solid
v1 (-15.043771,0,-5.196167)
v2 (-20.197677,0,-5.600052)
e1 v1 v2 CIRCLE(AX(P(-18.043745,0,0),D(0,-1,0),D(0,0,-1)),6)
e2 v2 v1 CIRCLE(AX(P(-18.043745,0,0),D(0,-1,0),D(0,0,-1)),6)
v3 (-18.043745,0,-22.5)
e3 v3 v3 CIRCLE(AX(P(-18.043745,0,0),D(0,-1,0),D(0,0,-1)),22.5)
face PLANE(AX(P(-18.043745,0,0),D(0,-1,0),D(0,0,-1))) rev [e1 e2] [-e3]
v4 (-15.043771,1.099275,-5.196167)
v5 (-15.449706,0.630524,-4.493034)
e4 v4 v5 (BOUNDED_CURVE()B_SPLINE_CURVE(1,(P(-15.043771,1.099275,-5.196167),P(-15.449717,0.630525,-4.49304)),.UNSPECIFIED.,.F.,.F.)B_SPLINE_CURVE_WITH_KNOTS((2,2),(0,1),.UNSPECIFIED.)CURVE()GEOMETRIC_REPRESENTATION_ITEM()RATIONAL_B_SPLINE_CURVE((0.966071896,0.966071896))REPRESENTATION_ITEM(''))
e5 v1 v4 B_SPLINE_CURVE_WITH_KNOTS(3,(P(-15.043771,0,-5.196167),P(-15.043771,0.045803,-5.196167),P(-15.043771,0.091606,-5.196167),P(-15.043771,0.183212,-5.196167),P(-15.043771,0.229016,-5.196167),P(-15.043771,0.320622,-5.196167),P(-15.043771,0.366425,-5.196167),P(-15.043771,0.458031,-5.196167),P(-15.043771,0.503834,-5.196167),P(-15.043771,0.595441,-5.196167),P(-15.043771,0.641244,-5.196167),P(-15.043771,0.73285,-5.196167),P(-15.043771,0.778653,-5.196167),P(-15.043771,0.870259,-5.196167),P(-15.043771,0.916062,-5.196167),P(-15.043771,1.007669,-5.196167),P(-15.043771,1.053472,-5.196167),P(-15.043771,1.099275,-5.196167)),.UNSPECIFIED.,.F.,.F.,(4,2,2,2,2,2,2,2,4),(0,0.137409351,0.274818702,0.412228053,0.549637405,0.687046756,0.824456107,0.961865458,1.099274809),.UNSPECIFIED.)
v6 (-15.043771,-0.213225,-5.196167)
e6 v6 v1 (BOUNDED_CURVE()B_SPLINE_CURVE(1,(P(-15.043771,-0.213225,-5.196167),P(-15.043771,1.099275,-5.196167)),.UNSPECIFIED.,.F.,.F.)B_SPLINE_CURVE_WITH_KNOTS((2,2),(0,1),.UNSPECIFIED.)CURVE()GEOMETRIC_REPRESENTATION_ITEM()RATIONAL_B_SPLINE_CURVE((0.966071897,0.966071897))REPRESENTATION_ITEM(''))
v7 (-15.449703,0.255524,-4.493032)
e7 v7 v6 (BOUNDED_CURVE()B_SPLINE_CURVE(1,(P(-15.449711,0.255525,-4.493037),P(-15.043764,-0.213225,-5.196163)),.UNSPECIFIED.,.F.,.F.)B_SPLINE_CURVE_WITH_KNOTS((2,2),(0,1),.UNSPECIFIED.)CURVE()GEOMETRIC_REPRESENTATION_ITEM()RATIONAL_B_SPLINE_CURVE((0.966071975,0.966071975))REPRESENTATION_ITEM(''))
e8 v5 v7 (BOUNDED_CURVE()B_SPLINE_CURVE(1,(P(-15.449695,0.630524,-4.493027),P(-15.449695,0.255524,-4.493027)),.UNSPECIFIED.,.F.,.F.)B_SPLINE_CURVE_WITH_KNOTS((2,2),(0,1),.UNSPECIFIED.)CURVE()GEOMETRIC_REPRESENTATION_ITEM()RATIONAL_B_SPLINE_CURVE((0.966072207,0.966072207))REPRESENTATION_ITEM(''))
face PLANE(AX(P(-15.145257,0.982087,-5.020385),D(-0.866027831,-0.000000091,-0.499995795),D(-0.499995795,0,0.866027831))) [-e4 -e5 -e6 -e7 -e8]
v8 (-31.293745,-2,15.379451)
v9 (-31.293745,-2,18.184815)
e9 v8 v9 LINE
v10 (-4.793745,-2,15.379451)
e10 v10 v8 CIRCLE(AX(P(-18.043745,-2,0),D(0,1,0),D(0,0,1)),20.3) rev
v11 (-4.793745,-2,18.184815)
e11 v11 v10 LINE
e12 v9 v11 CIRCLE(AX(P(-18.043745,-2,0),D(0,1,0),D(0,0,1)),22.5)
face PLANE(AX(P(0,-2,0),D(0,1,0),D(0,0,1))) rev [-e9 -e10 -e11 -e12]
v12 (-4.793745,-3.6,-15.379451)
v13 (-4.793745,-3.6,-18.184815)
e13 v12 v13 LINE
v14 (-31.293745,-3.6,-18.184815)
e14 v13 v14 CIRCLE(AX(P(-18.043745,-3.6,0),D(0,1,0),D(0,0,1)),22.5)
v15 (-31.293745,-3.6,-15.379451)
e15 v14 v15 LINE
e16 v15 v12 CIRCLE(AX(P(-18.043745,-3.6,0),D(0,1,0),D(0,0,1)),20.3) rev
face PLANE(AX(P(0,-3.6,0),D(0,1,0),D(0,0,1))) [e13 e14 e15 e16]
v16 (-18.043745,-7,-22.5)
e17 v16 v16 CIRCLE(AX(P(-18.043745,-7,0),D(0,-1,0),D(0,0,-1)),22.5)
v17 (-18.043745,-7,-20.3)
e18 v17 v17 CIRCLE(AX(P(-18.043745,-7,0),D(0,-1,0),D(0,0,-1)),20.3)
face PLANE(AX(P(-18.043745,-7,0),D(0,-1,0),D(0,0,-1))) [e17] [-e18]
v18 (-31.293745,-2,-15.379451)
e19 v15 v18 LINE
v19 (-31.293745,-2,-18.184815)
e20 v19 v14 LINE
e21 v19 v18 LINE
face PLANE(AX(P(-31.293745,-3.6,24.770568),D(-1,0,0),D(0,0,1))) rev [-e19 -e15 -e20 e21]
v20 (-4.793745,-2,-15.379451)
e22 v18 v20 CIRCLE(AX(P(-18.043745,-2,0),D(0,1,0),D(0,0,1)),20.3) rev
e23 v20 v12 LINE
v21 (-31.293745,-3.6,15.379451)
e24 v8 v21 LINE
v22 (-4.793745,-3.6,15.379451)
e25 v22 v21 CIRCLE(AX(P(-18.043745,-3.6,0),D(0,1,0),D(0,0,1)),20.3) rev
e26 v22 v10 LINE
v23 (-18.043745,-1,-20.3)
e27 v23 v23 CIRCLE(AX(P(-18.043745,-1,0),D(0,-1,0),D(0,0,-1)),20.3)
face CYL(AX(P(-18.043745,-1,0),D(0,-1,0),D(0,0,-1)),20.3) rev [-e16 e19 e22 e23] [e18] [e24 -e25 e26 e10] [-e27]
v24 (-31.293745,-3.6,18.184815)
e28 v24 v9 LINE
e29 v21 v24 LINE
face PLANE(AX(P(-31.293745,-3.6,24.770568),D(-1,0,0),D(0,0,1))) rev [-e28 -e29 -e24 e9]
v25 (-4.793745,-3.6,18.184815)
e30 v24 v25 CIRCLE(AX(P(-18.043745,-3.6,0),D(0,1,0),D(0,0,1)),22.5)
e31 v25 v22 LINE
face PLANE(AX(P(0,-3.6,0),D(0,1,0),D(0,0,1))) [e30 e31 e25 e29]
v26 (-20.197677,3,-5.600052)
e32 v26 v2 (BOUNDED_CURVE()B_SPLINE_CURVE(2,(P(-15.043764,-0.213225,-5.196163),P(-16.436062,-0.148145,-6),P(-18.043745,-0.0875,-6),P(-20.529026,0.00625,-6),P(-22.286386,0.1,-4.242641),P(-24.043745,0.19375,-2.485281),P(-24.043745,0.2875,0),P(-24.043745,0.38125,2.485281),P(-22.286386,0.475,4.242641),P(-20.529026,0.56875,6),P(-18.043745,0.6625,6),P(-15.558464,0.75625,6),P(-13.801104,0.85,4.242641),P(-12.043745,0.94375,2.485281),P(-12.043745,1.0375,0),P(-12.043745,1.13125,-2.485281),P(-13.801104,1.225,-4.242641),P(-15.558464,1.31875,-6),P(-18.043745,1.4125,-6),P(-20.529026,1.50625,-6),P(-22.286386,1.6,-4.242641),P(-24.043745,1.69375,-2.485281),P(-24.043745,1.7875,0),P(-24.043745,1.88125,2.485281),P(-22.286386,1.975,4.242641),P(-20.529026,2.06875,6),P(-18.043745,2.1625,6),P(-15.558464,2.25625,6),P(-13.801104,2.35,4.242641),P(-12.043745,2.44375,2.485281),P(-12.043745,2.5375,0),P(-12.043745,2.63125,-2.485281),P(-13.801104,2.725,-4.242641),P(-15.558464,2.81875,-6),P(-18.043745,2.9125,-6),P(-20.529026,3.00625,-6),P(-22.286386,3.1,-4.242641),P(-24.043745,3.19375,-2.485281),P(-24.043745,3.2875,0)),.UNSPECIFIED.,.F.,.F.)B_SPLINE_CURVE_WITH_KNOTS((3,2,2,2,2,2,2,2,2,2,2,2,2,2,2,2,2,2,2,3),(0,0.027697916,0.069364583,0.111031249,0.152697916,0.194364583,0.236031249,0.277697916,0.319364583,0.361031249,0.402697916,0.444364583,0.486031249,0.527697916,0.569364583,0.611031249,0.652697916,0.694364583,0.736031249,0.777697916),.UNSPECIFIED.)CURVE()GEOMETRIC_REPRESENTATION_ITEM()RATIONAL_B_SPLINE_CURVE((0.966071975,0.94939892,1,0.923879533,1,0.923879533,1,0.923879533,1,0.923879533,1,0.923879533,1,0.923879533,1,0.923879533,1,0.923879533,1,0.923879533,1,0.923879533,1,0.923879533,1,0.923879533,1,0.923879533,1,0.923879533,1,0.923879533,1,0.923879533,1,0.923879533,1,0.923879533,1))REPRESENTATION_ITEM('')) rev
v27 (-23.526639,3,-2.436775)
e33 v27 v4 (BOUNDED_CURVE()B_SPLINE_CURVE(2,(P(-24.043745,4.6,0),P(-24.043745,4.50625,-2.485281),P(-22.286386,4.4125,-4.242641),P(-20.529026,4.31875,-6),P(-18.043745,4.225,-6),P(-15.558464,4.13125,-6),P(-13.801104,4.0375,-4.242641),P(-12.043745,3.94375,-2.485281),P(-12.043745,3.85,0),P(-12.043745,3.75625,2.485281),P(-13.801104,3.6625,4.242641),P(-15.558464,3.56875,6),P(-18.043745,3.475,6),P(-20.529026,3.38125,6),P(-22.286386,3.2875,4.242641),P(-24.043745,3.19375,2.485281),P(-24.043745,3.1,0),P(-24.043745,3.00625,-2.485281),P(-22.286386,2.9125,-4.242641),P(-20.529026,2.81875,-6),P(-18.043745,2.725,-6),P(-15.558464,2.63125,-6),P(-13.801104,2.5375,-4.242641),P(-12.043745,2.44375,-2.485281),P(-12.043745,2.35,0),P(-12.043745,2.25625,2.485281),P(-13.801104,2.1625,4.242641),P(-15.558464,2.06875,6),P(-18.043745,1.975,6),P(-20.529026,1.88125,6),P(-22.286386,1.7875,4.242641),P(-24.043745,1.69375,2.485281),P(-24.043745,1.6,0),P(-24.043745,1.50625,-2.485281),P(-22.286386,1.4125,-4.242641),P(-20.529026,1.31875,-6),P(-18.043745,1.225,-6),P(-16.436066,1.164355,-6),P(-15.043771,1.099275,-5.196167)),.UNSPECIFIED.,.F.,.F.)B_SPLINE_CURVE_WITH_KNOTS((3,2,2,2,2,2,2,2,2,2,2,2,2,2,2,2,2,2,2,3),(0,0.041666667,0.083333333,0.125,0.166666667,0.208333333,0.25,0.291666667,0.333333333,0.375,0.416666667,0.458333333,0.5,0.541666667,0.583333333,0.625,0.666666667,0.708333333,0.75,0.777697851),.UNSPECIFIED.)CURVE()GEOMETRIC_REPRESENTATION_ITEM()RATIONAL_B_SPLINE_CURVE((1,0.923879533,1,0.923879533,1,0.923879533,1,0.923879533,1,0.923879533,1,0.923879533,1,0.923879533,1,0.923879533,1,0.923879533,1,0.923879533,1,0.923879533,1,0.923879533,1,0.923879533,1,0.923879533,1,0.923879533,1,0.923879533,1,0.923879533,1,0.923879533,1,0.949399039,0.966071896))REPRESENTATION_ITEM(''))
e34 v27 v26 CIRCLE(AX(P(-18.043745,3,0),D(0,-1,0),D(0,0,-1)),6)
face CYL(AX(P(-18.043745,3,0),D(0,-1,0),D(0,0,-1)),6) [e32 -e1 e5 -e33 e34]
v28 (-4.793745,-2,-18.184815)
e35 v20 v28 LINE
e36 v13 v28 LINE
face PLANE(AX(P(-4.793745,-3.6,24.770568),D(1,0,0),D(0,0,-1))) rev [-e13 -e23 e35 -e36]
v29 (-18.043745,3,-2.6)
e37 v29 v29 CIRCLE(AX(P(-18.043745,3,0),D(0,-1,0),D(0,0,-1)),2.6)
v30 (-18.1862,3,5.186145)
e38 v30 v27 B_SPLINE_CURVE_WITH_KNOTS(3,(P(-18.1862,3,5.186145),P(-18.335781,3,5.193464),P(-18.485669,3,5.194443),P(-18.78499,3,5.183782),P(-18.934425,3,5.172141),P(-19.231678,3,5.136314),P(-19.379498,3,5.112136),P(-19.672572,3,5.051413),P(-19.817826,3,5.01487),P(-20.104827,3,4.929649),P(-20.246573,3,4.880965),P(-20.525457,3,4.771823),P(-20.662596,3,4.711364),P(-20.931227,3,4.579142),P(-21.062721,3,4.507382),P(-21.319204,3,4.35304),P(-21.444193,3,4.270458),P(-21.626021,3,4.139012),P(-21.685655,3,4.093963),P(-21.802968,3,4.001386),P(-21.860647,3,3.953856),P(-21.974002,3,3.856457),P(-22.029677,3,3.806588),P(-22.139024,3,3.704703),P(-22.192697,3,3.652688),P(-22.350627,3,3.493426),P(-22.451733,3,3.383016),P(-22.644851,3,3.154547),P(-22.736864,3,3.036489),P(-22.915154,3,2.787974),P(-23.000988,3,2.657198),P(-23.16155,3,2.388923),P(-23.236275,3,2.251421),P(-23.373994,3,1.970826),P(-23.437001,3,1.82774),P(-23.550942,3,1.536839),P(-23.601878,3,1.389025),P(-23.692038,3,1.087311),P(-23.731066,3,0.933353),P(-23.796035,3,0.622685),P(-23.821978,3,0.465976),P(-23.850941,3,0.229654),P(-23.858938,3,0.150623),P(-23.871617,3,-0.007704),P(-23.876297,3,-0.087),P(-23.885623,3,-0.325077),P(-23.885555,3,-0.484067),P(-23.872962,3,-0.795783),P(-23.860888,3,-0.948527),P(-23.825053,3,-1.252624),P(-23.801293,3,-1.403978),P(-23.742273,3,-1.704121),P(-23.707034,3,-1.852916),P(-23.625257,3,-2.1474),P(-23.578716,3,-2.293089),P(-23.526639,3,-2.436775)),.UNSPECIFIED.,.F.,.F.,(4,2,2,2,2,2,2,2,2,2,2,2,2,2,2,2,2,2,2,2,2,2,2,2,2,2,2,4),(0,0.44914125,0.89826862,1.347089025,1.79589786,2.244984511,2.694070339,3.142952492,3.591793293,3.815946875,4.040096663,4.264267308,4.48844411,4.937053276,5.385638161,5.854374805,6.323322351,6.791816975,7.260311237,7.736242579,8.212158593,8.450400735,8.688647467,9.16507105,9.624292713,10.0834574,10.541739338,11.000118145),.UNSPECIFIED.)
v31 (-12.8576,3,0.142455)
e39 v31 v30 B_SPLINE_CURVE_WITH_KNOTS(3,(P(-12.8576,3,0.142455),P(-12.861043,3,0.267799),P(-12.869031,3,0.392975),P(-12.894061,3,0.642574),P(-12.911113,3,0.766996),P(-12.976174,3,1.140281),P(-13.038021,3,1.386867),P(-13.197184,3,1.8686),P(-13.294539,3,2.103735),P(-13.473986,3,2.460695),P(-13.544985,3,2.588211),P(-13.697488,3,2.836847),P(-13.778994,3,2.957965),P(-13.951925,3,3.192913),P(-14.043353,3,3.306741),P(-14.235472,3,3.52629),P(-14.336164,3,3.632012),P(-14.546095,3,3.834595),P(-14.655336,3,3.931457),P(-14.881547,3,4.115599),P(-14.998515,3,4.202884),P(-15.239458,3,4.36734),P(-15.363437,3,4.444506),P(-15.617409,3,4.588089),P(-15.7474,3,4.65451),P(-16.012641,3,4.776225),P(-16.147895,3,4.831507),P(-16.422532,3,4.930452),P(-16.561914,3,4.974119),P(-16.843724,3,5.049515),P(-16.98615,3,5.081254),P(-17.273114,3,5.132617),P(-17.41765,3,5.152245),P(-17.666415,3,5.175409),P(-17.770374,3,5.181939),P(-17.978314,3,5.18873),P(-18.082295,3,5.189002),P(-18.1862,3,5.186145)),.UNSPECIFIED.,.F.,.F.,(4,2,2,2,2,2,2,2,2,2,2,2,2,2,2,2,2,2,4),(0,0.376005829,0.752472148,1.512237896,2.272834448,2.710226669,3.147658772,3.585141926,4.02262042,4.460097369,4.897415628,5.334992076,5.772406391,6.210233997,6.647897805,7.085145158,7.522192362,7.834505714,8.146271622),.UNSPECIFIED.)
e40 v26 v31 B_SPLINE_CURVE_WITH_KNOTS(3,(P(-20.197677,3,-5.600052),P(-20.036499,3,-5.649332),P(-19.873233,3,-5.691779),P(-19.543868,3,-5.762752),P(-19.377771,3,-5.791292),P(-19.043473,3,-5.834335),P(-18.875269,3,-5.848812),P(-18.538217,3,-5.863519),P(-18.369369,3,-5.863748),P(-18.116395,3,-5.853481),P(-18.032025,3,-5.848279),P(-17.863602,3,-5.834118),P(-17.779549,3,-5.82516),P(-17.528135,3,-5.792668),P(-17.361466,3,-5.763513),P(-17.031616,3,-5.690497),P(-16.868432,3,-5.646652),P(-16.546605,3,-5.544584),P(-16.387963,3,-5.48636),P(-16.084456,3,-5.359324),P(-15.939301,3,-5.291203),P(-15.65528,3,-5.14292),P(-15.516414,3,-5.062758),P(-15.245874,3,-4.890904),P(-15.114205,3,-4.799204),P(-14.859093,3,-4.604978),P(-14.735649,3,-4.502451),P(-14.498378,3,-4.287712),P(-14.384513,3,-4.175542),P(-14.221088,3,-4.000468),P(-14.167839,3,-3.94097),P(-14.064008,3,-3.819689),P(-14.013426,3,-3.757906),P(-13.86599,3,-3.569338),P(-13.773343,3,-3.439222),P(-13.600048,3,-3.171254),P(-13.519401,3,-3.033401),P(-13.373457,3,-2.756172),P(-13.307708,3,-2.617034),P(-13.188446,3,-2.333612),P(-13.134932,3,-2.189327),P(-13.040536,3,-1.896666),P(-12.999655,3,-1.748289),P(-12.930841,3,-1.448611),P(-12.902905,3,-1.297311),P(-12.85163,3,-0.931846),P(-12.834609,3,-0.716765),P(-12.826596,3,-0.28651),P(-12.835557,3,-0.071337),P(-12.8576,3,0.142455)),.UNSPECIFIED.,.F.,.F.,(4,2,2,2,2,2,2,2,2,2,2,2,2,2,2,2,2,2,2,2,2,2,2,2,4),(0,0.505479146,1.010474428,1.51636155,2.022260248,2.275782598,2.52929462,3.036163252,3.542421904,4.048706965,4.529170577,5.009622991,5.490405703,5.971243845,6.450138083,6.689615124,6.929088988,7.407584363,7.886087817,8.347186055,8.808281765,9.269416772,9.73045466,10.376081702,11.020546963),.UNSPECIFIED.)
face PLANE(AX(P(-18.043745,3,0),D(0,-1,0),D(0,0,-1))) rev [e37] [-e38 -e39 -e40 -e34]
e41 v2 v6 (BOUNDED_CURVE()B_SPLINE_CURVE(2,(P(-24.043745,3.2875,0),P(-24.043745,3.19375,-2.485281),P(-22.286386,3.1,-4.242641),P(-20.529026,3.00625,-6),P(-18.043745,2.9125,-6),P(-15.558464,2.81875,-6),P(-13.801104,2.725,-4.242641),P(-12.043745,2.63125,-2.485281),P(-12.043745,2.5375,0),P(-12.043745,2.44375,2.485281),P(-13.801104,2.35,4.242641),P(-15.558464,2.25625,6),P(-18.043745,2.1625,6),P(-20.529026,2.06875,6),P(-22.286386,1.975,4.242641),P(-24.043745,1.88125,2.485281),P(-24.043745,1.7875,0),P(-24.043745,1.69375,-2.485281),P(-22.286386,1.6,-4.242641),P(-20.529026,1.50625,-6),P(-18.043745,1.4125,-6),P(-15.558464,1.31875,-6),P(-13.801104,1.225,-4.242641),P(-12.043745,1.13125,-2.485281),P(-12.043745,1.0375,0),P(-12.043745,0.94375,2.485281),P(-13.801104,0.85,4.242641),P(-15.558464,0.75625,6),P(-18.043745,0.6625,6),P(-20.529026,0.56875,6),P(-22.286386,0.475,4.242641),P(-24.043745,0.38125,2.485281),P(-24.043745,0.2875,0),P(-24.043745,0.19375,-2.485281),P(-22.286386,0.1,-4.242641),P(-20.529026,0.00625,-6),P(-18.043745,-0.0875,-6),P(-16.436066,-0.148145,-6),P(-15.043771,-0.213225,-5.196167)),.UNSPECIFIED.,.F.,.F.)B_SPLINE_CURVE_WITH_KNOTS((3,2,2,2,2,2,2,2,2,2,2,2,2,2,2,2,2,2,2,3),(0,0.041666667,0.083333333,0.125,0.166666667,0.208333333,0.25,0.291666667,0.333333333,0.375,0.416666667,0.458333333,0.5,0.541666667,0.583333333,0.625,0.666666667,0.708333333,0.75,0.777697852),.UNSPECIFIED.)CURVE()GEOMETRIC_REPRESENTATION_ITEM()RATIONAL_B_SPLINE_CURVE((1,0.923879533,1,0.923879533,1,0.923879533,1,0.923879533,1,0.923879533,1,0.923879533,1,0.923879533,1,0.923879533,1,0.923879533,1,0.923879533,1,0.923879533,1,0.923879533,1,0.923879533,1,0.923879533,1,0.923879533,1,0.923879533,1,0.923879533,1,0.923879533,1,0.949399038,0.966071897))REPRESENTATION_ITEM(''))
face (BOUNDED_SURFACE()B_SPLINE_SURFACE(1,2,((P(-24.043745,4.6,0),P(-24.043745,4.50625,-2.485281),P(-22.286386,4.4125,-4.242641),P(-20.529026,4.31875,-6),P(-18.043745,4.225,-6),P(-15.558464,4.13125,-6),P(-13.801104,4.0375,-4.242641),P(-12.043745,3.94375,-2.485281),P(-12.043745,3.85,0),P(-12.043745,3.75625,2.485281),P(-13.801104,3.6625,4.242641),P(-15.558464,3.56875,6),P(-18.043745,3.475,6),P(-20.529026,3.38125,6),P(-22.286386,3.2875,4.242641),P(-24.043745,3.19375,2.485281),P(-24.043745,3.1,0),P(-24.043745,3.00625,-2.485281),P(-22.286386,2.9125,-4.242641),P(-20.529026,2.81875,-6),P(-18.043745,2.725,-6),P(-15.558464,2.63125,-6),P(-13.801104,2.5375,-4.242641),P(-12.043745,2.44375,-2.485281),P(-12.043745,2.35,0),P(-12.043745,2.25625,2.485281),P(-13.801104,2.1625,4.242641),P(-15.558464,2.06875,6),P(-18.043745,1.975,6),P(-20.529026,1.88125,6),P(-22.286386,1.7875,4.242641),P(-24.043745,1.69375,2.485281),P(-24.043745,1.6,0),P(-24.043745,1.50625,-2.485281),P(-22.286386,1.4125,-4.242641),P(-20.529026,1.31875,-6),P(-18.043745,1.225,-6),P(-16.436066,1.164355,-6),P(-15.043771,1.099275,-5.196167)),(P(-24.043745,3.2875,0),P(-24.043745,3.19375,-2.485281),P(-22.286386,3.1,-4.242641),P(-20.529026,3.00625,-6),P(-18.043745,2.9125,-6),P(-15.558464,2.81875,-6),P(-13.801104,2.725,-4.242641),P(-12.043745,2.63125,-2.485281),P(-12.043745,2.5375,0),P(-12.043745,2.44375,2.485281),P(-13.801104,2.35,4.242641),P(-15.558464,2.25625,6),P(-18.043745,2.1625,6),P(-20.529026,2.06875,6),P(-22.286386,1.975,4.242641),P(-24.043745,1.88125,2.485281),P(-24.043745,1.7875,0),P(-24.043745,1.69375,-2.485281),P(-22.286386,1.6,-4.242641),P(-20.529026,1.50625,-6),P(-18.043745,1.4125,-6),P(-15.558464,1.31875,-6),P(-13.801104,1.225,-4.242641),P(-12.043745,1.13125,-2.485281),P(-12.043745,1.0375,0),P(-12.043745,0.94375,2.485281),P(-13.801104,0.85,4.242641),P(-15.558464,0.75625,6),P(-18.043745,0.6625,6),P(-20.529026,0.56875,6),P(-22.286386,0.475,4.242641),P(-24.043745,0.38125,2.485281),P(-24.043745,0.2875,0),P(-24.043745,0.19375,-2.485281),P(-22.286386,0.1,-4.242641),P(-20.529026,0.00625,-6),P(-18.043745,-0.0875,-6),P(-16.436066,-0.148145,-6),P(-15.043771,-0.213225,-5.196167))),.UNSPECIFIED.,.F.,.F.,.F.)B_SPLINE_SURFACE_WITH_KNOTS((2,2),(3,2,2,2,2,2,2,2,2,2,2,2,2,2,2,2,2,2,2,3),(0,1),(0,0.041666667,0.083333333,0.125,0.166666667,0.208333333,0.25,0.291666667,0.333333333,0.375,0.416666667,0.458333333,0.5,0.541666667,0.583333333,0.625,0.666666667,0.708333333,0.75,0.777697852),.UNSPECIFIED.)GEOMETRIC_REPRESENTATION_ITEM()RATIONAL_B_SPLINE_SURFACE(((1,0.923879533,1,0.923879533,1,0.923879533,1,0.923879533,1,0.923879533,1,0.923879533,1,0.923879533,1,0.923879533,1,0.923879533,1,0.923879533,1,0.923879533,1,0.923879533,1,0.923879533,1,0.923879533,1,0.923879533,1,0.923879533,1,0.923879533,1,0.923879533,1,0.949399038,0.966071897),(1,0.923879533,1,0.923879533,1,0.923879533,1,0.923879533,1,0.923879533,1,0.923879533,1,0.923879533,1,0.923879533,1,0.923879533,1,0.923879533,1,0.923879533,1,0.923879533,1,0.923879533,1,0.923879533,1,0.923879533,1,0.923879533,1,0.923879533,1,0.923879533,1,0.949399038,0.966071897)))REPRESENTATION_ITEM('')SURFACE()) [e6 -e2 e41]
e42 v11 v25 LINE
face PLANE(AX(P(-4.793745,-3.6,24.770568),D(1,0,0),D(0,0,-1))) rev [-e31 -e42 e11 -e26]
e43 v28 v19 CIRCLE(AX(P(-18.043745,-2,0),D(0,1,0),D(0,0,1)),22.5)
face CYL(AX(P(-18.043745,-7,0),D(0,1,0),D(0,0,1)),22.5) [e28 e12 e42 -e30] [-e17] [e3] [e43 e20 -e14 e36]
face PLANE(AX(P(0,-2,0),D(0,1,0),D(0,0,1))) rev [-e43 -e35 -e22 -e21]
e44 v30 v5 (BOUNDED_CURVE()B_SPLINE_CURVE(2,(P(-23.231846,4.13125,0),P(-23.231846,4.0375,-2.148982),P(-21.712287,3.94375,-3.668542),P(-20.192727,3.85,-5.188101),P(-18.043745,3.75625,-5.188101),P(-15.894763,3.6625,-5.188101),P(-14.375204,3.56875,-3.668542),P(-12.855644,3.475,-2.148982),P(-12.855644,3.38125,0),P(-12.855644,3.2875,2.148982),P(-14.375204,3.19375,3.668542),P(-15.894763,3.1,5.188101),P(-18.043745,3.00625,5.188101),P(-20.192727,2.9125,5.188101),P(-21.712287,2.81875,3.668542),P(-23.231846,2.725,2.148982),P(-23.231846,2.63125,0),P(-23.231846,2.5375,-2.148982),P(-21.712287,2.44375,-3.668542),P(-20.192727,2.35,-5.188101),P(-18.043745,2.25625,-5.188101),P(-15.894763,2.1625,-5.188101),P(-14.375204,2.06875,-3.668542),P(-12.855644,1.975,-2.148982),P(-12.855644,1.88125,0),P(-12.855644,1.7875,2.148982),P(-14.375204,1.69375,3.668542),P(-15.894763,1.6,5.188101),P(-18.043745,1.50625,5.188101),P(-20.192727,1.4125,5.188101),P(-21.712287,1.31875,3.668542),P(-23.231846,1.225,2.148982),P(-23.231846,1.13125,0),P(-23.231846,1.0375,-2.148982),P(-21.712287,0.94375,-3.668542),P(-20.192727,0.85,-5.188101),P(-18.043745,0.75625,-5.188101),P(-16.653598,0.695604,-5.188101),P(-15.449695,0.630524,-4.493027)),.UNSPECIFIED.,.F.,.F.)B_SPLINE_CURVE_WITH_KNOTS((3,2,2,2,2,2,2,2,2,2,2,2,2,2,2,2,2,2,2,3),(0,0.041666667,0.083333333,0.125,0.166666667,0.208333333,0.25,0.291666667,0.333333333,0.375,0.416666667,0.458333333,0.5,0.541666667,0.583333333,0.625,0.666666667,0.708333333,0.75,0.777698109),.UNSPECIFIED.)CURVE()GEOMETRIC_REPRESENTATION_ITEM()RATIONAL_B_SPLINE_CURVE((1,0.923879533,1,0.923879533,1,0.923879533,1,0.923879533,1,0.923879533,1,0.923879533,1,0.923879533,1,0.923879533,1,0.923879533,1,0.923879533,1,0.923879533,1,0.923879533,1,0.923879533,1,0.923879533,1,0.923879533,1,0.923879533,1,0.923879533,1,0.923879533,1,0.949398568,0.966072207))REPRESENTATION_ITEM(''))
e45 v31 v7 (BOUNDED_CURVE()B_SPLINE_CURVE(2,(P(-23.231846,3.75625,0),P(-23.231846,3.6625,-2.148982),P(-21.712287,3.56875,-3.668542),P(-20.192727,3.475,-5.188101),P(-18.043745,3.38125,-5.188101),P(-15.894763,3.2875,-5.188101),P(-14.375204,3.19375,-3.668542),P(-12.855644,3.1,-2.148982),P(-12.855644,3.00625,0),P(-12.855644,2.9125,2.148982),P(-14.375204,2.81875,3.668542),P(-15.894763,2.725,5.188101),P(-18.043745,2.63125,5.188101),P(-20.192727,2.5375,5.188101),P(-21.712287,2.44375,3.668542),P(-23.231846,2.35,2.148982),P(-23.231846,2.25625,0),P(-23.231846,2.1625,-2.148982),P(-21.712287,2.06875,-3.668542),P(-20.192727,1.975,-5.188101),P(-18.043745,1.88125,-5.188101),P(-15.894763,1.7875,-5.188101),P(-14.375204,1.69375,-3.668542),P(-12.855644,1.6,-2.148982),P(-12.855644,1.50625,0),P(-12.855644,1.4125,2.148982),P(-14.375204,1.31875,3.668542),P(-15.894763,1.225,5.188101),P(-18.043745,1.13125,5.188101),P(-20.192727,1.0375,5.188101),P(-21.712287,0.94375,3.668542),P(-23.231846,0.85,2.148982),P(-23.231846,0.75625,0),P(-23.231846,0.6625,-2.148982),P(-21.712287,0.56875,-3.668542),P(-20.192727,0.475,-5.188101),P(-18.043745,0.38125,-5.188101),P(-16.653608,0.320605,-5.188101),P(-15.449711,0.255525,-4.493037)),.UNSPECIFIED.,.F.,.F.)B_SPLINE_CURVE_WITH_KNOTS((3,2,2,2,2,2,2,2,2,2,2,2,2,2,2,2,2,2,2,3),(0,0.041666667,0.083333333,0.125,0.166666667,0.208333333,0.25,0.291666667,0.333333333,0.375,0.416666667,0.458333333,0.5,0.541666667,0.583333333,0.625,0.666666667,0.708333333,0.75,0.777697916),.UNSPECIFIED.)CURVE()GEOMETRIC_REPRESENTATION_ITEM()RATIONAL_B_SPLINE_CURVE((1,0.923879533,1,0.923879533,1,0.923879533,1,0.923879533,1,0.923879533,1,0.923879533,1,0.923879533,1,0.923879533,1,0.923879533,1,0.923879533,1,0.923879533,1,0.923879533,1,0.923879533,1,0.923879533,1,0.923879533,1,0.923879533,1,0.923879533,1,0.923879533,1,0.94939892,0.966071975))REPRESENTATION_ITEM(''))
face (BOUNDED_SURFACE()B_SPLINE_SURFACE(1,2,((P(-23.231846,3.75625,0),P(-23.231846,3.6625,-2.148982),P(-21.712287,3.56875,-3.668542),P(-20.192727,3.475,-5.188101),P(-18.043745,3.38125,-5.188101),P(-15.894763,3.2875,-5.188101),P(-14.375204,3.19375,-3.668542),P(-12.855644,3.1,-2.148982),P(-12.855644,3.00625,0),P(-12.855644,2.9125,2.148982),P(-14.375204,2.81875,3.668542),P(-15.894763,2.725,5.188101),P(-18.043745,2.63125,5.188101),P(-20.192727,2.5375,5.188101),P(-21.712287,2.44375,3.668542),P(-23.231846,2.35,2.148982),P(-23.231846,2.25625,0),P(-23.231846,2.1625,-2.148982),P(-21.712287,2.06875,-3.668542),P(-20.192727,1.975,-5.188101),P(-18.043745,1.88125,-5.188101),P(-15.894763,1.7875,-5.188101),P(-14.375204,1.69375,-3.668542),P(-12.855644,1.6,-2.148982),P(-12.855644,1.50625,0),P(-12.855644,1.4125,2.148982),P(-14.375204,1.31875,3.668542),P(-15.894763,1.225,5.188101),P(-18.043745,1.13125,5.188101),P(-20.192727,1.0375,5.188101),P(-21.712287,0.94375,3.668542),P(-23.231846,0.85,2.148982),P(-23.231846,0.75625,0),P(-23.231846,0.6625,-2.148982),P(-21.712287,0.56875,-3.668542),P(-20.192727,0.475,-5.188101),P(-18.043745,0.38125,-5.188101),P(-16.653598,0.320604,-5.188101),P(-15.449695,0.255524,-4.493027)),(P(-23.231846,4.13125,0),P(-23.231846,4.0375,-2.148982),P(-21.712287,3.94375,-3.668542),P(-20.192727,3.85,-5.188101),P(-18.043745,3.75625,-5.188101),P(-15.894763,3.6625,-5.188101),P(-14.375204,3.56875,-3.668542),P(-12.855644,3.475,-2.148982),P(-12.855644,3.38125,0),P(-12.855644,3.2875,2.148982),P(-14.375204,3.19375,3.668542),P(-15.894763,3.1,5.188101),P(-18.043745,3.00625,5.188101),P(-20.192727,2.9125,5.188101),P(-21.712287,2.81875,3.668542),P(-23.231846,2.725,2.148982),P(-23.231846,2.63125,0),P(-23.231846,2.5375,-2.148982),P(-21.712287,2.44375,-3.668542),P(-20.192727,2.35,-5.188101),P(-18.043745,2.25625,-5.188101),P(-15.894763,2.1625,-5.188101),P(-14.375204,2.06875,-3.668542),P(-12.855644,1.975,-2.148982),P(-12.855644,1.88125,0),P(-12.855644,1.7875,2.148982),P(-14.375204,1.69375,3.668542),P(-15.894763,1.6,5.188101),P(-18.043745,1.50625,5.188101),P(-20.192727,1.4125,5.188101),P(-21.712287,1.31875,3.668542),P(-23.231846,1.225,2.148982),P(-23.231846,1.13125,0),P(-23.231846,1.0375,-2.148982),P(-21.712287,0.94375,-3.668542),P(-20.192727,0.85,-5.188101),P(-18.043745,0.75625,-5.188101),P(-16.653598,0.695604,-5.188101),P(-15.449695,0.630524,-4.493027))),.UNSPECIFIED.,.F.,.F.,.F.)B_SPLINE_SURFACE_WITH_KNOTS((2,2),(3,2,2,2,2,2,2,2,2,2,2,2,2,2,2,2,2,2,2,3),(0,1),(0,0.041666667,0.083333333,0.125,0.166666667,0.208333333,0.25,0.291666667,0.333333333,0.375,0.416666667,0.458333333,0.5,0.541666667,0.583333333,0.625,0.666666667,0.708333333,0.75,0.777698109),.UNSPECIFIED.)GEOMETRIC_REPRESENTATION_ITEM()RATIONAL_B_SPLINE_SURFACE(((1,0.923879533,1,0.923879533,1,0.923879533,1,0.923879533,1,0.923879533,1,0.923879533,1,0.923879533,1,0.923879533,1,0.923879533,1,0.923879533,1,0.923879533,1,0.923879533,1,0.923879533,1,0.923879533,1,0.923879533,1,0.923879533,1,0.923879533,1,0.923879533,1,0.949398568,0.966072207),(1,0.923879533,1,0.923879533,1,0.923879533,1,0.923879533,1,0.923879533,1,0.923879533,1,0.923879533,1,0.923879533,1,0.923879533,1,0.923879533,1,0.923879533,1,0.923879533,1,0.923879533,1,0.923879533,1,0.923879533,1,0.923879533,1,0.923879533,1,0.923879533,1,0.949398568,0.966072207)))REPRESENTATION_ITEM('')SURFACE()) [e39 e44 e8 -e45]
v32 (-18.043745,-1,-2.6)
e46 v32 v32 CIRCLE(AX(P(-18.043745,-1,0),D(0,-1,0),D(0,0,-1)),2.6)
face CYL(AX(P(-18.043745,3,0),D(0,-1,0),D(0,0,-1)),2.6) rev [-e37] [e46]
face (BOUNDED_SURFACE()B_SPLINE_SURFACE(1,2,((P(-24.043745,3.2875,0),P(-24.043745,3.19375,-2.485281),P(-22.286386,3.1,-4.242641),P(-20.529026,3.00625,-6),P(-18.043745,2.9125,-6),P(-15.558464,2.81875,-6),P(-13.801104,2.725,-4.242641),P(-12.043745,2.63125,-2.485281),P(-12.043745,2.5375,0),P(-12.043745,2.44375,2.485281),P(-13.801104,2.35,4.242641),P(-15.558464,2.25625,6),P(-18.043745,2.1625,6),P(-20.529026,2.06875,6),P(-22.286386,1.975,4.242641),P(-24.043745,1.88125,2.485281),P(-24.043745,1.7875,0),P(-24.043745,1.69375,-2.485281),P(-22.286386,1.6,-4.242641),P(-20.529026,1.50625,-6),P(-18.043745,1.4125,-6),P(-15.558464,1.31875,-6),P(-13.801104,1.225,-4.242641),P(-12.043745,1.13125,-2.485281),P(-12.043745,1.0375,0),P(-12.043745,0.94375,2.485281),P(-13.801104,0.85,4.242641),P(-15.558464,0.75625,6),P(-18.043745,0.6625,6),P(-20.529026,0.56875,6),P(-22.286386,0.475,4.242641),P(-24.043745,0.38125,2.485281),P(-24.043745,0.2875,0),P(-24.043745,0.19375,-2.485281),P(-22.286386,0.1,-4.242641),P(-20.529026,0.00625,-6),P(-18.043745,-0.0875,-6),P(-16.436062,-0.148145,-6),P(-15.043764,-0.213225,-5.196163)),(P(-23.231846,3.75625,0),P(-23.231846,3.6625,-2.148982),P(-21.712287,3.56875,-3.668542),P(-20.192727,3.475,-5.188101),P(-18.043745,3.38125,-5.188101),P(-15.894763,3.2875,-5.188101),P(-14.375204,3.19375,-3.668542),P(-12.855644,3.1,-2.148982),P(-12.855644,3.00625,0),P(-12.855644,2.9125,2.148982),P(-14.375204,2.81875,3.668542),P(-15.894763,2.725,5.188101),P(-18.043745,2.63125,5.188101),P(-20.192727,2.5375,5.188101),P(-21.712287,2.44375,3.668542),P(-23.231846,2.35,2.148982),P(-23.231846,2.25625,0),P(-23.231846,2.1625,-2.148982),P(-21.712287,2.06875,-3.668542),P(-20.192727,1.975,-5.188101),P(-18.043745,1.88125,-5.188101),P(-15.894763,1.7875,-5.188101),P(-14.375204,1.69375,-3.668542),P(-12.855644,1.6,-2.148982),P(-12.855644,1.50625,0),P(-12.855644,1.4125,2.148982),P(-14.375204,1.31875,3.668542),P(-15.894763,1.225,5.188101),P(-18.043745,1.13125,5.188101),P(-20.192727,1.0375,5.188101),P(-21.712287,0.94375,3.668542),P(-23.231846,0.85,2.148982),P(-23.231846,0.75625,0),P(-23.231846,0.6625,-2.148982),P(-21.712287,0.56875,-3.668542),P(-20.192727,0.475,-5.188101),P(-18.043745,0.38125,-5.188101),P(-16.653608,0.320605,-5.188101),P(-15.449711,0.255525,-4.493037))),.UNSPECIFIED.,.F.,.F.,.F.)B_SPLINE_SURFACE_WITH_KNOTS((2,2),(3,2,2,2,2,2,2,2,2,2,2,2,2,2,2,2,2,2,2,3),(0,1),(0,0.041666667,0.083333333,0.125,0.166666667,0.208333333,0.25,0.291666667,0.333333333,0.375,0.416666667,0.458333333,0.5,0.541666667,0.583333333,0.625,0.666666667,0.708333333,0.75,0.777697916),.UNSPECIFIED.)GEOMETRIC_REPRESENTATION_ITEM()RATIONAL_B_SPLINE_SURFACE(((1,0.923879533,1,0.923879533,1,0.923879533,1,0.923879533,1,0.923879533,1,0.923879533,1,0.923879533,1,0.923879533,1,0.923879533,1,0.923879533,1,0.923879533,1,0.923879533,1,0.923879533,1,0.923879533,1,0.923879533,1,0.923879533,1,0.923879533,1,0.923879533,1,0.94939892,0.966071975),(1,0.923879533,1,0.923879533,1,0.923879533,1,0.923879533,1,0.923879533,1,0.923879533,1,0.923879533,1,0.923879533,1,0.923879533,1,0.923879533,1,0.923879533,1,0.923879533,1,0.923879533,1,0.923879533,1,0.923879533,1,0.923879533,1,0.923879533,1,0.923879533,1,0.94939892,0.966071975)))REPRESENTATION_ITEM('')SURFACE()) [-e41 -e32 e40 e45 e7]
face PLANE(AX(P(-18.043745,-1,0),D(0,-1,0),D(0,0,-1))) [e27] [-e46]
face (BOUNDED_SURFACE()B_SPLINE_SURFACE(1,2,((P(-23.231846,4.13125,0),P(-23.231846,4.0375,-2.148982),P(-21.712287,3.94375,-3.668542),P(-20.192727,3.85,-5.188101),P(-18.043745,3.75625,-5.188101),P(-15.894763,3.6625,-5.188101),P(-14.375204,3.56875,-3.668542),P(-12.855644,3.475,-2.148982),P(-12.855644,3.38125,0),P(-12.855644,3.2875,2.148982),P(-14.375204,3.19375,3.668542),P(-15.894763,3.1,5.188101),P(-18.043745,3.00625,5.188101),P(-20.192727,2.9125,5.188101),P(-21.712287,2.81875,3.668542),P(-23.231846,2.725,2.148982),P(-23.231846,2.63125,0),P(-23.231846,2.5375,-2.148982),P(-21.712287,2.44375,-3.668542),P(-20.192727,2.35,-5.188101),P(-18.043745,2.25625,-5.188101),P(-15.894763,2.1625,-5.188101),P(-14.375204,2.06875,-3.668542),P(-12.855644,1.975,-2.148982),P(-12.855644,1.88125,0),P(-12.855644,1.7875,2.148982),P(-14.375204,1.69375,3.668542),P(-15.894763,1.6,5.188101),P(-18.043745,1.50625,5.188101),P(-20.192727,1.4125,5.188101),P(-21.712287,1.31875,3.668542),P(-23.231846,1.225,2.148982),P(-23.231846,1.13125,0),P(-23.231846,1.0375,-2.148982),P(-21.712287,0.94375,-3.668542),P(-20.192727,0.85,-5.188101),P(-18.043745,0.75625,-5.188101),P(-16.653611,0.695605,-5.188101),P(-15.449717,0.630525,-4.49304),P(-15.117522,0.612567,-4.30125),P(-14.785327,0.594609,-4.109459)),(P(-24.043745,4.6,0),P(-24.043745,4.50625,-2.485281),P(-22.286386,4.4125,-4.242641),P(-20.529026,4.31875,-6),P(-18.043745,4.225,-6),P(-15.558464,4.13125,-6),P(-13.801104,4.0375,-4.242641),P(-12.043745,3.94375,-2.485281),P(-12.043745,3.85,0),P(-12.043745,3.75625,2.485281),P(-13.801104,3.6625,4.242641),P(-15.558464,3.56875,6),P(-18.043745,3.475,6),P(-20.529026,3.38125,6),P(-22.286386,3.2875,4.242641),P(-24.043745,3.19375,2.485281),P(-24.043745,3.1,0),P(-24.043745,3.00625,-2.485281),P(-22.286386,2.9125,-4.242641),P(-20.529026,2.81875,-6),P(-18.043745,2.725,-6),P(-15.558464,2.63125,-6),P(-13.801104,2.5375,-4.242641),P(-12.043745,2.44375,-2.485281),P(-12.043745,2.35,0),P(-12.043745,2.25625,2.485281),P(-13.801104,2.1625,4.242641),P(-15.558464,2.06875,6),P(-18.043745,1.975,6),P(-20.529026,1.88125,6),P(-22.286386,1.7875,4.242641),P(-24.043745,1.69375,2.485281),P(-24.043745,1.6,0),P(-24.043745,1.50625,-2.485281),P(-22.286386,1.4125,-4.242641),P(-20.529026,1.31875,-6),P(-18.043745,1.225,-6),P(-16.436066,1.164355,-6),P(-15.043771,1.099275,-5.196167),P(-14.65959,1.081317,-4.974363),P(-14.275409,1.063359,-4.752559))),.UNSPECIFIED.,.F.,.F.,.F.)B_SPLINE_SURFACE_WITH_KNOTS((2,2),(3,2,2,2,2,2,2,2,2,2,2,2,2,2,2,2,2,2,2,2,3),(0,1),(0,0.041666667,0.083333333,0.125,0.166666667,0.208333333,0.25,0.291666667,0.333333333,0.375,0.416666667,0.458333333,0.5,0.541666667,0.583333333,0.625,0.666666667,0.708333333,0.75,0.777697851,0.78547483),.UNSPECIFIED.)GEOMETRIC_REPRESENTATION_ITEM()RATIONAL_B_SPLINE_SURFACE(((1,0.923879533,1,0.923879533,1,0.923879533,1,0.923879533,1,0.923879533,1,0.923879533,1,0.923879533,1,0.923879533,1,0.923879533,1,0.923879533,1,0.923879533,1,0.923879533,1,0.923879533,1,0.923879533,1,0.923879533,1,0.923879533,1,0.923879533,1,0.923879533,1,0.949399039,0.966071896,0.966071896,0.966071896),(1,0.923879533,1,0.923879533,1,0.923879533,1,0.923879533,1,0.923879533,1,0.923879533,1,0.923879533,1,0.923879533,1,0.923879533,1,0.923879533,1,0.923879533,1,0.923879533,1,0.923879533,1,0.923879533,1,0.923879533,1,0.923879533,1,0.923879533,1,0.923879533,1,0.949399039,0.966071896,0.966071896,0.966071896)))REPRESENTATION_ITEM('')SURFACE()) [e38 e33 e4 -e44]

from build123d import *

# Parameters (mm, degrees)
SKIZZE1_R                            = 5
ZYLINDER_DEPTH                       = 2.2
SCHNITT_LINEAR_AUSTRAGEN1_DEPTH      = 10
SCHNITT_LINEAR_AUSTRAGEN1_DEPTH_BACK = 5
SKIZZE4_R                            = 4.5
SKIZZE6_R                            = 22.5
FASSUNG_OBJEKTTR_GERGEWINDE_DEPTH    = 7
SKIZZE11_R                           = 20.3
BOHRUNG_F_R_INNENGEWINDE_DEPTH       = 6
SKIZZE13_R                           = 6
AUFSATZ_LINEAR_AUSTRAGEN1_DEPTH      = 3
SKIZZE16_R                           = 2.6
SCHNITT_LINEAR_AUSTRAGEN13_DEPTH     = 10
GEWINDE1_PITCH                       = 1.5
SKIZZE17_W                           = 26.5
SKIZZE17_H                           = 49.541135346
SCHNITT_LINEAR_AUSTRAGEN14_DEPTH     = 1.6


with BuildPart() as part:
    # Skizze1 → Zylinder (new body)
    with BuildSketch(Plane(origin=(0, 0, 0), x_dir=(1, 0, 0), z_dir=(0, 1, 0))):
        with Locations(Location((-18.043745097, 0, 0), (0, 0, 270))):
            Circle(SKIZZE1_R)
    extrude(amount=ZYLINDER_DEPTH)

    # Skizze4 → Schnitt-Linear austragen1 (cut, two sides: drawn at the far end of the back side and taken through both)
    with BuildSketch(Plane(origin=(0, 2.2, 0), x_dir=(1, 0, 0), z_dir=(0, 1, 0)).offset(-SCHNITT_LINEAR_AUSTRAGEN1_DEPTH_BACK)):
        with Locations(Location((-18.043745097, 0, 0), (0, 0, 270))):
            Circle(SKIZZE4_R)
    extrude(amount=SCHNITT_LINEAR_AUSTRAGEN1_DEPTH + SCHNITT_LINEAR_AUSTRAGEN1_DEPTH_BACK, mode=Mode.SUBTRACT)

    # Skizze6 → Fassung Objektträgergewinde (add)
    with BuildSketch(Plane(origin=(0, 0, 0), x_dir=(-1, 0, 0), z_dir=(0, -1, 0))):
        with Locations(Location((18.043745097, 0, 0), (0, 0, 90))):
            Circle(SKIZZE6_R)
    extrude(amount=FASSUNG_OBJEKTTR_GERGEWINDE_DEPTH)

    # Skizze11 → Bohrung für Innengewinde (cut)
    with BuildSketch(Plane(origin=(0, -7, 0), x_dir=(-1, 0, 0), z_dir=(0, -1, 0))):
        with Locations(Location((18.043745097, 0, 0), (0, 0, 90))):
            Circle(SKIZZE11_R)
    extrude(amount=-BOHRUNG_F_R_INNENGEWINDE_DEPTH, mode=Mode.SUBTRACT)

    # Skizze13 → Aufsatz-Linear austragen1 (add)
    with BuildSketch(Plane(origin=(0, 0, 0), x_dir=(-1, 0, 0), z_dir=(0, -1, 0))):
        with Locations(Location((18.043745097, 0, 0), (0, 0, 90))):
            Circle(SKIZZE13_R)
    extrude(amount=-AUFSATZ_LINEAR_AUSTRAGEN1_DEPTH)

    # Skizze16 → Schnitt-Linear austragen13 (cut)
    with BuildSketch(Plane(origin=(0, -7, 0), x_dir=(-1, 0, 0), z_dir=(0, -1, 0))):
        with Locations(Location((18.043745097, 0, 0), (0, 0, 90))):
            Circle(SKIZZE16_R)
    extrude(amount=-SCHNITT_LINEAR_AUSTRAGEN13_DEPTH, mode=Mode.SUBTRACT)

    # Gewinde1: the profile of Gewindeprofil1 profile screwed along a right-hand helix of 2.333333 turns, 8 arcs to a turn; built about Z, then put on its axis
    gewinde1_z = Axis((0, 0, 0), (0, 0, 1))
    gewinde1_corners = [(6.0003, 0, -0.000173205), (6.0003, 0, 1.312673201), (5.188101187, 0, 0.843749998), (5.188101187, 0, 0.468749998)]
    with BuildLine(mode=Mode.PRIVATE) as gewinde1_profile:
        Line(gewinde1_corners[0], gewinde1_corners[1])
        Line(gewinde1_corners[1], gewinde1_corners[2])
        Line(gewinde1_corners[2], gewinde1_corners[3])
        Line(gewinde1_corners[3], gewinde1_corners[0])
    gewinde1_cap = Face(gewinde1_profile.wire())
    gewinde1_turn_angles = [0, 22.5, 45, 67.5, 90, 112.5, 135, 157.5, 180, 202.5, 225, 247.5, 270, 292.5, 315, 337.5, 360]
    gewinde1_turn_weights = [1, 0.9238795325112867, 1, 0.9238795325112867, 1, 0.9238795325112867, 1, 0.9238795325112867, 1, 0.9238795325112867, 1, 0.9238795325112867, 1, 0.9238795325112867, 1, 0.9238795325112867, 1]
    gewinde1_turn_rails = [Edge.make_bspline([Vector(p[0], p[1], 0).rotate(gewinde1_z, gewinde1_turn_angles[k]) / gewinde1_turn_weights[k] + Vector(0, 0, p[2] + GEWINDE1_PITCH * gewinde1_turn_angles[k] / 360) for k in range(17)], [0, 0, 0, 1, 1, 2, 2, 3, 3, 4, 4, 5, 5, 6, 6, 7, 7, 8, 8, 8], 2, gewinde1_turn_weights) for p in gewinde1_corners]
    gewinde1_turn_sides = [Face.make_surface_from_curves(gewinde1_turn_rails[p[0]], gewinde1_turn_rails[p[1]]) for p in [(0, 1), (1, 2), (2, 3), (3, 0)]]
    gewinde1_last_angles = [720, 742.5, 765, 787.5, 810, 825, 840]
    gewinde1_last_weights = [1, 0.9238795325112867, 1, 0.9238795325112867, 1, 0.9659258262890685, 1]
    gewinde1_last_rails = [Edge.make_bspline([Vector(p[0], p[1], 0).rotate(gewinde1_z, gewinde1_last_angles[k]) / gewinde1_last_weights[k] + Vector(0, 0, p[2] + GEWINDE1_PITCH * gewinde1_last_angles[k] / 360) for k in range(7)], [0, 0, 0, 1, 1, 2, 2, 3, 3, 3], 2, gewinde1_last_weights) for p in gewinde1_corners]
    gewinde1_last_sides = [Face.make_surface_from_curves(gewinde1_last_rails[p[0]], gewinde1_last_rails[p[1]]) for p in [(0, 1), (1, 2), (2, 3), (3, 0)]]
    gewinde1 = Plane(origin=(-18.043745097, 4.6, 0), x_dir=(-1, 0, 0), z_dir=(0, -1, 0)) * Solid(Shell([*[p.moved(Location((0, 0, GEWINDE1_PITCH * i))) for i in range(2) for p in gewinde1_turn_sides], *gewinde1_last_sides, gewinde1_cap, gewinde1_cap.rotate(gewinde1_z, 840).moved(Location((0, 0, GEWINDE1_PITCH * 840 / 360)))]))
    add(gewinde1, mode=Mode.SUBTRACT)

    # Skizze17 → Schnitt-Linear austragen14 (cut)
    with BuildSketch(Plane(origin=(0, -2, 0), x_dir=(1, 0, 0), z_dir=(0, 1, 0))):
        with Locations((-18.043745097, 0)):
            Rectangle(SKIZZE17_W, SKIZZE17_H)
    extrude(amount=-SCHNITT_LINEAR_AUSTRAGEN14_DEPTH, mode=Mode.SUBTRACT)


solid = part.part
